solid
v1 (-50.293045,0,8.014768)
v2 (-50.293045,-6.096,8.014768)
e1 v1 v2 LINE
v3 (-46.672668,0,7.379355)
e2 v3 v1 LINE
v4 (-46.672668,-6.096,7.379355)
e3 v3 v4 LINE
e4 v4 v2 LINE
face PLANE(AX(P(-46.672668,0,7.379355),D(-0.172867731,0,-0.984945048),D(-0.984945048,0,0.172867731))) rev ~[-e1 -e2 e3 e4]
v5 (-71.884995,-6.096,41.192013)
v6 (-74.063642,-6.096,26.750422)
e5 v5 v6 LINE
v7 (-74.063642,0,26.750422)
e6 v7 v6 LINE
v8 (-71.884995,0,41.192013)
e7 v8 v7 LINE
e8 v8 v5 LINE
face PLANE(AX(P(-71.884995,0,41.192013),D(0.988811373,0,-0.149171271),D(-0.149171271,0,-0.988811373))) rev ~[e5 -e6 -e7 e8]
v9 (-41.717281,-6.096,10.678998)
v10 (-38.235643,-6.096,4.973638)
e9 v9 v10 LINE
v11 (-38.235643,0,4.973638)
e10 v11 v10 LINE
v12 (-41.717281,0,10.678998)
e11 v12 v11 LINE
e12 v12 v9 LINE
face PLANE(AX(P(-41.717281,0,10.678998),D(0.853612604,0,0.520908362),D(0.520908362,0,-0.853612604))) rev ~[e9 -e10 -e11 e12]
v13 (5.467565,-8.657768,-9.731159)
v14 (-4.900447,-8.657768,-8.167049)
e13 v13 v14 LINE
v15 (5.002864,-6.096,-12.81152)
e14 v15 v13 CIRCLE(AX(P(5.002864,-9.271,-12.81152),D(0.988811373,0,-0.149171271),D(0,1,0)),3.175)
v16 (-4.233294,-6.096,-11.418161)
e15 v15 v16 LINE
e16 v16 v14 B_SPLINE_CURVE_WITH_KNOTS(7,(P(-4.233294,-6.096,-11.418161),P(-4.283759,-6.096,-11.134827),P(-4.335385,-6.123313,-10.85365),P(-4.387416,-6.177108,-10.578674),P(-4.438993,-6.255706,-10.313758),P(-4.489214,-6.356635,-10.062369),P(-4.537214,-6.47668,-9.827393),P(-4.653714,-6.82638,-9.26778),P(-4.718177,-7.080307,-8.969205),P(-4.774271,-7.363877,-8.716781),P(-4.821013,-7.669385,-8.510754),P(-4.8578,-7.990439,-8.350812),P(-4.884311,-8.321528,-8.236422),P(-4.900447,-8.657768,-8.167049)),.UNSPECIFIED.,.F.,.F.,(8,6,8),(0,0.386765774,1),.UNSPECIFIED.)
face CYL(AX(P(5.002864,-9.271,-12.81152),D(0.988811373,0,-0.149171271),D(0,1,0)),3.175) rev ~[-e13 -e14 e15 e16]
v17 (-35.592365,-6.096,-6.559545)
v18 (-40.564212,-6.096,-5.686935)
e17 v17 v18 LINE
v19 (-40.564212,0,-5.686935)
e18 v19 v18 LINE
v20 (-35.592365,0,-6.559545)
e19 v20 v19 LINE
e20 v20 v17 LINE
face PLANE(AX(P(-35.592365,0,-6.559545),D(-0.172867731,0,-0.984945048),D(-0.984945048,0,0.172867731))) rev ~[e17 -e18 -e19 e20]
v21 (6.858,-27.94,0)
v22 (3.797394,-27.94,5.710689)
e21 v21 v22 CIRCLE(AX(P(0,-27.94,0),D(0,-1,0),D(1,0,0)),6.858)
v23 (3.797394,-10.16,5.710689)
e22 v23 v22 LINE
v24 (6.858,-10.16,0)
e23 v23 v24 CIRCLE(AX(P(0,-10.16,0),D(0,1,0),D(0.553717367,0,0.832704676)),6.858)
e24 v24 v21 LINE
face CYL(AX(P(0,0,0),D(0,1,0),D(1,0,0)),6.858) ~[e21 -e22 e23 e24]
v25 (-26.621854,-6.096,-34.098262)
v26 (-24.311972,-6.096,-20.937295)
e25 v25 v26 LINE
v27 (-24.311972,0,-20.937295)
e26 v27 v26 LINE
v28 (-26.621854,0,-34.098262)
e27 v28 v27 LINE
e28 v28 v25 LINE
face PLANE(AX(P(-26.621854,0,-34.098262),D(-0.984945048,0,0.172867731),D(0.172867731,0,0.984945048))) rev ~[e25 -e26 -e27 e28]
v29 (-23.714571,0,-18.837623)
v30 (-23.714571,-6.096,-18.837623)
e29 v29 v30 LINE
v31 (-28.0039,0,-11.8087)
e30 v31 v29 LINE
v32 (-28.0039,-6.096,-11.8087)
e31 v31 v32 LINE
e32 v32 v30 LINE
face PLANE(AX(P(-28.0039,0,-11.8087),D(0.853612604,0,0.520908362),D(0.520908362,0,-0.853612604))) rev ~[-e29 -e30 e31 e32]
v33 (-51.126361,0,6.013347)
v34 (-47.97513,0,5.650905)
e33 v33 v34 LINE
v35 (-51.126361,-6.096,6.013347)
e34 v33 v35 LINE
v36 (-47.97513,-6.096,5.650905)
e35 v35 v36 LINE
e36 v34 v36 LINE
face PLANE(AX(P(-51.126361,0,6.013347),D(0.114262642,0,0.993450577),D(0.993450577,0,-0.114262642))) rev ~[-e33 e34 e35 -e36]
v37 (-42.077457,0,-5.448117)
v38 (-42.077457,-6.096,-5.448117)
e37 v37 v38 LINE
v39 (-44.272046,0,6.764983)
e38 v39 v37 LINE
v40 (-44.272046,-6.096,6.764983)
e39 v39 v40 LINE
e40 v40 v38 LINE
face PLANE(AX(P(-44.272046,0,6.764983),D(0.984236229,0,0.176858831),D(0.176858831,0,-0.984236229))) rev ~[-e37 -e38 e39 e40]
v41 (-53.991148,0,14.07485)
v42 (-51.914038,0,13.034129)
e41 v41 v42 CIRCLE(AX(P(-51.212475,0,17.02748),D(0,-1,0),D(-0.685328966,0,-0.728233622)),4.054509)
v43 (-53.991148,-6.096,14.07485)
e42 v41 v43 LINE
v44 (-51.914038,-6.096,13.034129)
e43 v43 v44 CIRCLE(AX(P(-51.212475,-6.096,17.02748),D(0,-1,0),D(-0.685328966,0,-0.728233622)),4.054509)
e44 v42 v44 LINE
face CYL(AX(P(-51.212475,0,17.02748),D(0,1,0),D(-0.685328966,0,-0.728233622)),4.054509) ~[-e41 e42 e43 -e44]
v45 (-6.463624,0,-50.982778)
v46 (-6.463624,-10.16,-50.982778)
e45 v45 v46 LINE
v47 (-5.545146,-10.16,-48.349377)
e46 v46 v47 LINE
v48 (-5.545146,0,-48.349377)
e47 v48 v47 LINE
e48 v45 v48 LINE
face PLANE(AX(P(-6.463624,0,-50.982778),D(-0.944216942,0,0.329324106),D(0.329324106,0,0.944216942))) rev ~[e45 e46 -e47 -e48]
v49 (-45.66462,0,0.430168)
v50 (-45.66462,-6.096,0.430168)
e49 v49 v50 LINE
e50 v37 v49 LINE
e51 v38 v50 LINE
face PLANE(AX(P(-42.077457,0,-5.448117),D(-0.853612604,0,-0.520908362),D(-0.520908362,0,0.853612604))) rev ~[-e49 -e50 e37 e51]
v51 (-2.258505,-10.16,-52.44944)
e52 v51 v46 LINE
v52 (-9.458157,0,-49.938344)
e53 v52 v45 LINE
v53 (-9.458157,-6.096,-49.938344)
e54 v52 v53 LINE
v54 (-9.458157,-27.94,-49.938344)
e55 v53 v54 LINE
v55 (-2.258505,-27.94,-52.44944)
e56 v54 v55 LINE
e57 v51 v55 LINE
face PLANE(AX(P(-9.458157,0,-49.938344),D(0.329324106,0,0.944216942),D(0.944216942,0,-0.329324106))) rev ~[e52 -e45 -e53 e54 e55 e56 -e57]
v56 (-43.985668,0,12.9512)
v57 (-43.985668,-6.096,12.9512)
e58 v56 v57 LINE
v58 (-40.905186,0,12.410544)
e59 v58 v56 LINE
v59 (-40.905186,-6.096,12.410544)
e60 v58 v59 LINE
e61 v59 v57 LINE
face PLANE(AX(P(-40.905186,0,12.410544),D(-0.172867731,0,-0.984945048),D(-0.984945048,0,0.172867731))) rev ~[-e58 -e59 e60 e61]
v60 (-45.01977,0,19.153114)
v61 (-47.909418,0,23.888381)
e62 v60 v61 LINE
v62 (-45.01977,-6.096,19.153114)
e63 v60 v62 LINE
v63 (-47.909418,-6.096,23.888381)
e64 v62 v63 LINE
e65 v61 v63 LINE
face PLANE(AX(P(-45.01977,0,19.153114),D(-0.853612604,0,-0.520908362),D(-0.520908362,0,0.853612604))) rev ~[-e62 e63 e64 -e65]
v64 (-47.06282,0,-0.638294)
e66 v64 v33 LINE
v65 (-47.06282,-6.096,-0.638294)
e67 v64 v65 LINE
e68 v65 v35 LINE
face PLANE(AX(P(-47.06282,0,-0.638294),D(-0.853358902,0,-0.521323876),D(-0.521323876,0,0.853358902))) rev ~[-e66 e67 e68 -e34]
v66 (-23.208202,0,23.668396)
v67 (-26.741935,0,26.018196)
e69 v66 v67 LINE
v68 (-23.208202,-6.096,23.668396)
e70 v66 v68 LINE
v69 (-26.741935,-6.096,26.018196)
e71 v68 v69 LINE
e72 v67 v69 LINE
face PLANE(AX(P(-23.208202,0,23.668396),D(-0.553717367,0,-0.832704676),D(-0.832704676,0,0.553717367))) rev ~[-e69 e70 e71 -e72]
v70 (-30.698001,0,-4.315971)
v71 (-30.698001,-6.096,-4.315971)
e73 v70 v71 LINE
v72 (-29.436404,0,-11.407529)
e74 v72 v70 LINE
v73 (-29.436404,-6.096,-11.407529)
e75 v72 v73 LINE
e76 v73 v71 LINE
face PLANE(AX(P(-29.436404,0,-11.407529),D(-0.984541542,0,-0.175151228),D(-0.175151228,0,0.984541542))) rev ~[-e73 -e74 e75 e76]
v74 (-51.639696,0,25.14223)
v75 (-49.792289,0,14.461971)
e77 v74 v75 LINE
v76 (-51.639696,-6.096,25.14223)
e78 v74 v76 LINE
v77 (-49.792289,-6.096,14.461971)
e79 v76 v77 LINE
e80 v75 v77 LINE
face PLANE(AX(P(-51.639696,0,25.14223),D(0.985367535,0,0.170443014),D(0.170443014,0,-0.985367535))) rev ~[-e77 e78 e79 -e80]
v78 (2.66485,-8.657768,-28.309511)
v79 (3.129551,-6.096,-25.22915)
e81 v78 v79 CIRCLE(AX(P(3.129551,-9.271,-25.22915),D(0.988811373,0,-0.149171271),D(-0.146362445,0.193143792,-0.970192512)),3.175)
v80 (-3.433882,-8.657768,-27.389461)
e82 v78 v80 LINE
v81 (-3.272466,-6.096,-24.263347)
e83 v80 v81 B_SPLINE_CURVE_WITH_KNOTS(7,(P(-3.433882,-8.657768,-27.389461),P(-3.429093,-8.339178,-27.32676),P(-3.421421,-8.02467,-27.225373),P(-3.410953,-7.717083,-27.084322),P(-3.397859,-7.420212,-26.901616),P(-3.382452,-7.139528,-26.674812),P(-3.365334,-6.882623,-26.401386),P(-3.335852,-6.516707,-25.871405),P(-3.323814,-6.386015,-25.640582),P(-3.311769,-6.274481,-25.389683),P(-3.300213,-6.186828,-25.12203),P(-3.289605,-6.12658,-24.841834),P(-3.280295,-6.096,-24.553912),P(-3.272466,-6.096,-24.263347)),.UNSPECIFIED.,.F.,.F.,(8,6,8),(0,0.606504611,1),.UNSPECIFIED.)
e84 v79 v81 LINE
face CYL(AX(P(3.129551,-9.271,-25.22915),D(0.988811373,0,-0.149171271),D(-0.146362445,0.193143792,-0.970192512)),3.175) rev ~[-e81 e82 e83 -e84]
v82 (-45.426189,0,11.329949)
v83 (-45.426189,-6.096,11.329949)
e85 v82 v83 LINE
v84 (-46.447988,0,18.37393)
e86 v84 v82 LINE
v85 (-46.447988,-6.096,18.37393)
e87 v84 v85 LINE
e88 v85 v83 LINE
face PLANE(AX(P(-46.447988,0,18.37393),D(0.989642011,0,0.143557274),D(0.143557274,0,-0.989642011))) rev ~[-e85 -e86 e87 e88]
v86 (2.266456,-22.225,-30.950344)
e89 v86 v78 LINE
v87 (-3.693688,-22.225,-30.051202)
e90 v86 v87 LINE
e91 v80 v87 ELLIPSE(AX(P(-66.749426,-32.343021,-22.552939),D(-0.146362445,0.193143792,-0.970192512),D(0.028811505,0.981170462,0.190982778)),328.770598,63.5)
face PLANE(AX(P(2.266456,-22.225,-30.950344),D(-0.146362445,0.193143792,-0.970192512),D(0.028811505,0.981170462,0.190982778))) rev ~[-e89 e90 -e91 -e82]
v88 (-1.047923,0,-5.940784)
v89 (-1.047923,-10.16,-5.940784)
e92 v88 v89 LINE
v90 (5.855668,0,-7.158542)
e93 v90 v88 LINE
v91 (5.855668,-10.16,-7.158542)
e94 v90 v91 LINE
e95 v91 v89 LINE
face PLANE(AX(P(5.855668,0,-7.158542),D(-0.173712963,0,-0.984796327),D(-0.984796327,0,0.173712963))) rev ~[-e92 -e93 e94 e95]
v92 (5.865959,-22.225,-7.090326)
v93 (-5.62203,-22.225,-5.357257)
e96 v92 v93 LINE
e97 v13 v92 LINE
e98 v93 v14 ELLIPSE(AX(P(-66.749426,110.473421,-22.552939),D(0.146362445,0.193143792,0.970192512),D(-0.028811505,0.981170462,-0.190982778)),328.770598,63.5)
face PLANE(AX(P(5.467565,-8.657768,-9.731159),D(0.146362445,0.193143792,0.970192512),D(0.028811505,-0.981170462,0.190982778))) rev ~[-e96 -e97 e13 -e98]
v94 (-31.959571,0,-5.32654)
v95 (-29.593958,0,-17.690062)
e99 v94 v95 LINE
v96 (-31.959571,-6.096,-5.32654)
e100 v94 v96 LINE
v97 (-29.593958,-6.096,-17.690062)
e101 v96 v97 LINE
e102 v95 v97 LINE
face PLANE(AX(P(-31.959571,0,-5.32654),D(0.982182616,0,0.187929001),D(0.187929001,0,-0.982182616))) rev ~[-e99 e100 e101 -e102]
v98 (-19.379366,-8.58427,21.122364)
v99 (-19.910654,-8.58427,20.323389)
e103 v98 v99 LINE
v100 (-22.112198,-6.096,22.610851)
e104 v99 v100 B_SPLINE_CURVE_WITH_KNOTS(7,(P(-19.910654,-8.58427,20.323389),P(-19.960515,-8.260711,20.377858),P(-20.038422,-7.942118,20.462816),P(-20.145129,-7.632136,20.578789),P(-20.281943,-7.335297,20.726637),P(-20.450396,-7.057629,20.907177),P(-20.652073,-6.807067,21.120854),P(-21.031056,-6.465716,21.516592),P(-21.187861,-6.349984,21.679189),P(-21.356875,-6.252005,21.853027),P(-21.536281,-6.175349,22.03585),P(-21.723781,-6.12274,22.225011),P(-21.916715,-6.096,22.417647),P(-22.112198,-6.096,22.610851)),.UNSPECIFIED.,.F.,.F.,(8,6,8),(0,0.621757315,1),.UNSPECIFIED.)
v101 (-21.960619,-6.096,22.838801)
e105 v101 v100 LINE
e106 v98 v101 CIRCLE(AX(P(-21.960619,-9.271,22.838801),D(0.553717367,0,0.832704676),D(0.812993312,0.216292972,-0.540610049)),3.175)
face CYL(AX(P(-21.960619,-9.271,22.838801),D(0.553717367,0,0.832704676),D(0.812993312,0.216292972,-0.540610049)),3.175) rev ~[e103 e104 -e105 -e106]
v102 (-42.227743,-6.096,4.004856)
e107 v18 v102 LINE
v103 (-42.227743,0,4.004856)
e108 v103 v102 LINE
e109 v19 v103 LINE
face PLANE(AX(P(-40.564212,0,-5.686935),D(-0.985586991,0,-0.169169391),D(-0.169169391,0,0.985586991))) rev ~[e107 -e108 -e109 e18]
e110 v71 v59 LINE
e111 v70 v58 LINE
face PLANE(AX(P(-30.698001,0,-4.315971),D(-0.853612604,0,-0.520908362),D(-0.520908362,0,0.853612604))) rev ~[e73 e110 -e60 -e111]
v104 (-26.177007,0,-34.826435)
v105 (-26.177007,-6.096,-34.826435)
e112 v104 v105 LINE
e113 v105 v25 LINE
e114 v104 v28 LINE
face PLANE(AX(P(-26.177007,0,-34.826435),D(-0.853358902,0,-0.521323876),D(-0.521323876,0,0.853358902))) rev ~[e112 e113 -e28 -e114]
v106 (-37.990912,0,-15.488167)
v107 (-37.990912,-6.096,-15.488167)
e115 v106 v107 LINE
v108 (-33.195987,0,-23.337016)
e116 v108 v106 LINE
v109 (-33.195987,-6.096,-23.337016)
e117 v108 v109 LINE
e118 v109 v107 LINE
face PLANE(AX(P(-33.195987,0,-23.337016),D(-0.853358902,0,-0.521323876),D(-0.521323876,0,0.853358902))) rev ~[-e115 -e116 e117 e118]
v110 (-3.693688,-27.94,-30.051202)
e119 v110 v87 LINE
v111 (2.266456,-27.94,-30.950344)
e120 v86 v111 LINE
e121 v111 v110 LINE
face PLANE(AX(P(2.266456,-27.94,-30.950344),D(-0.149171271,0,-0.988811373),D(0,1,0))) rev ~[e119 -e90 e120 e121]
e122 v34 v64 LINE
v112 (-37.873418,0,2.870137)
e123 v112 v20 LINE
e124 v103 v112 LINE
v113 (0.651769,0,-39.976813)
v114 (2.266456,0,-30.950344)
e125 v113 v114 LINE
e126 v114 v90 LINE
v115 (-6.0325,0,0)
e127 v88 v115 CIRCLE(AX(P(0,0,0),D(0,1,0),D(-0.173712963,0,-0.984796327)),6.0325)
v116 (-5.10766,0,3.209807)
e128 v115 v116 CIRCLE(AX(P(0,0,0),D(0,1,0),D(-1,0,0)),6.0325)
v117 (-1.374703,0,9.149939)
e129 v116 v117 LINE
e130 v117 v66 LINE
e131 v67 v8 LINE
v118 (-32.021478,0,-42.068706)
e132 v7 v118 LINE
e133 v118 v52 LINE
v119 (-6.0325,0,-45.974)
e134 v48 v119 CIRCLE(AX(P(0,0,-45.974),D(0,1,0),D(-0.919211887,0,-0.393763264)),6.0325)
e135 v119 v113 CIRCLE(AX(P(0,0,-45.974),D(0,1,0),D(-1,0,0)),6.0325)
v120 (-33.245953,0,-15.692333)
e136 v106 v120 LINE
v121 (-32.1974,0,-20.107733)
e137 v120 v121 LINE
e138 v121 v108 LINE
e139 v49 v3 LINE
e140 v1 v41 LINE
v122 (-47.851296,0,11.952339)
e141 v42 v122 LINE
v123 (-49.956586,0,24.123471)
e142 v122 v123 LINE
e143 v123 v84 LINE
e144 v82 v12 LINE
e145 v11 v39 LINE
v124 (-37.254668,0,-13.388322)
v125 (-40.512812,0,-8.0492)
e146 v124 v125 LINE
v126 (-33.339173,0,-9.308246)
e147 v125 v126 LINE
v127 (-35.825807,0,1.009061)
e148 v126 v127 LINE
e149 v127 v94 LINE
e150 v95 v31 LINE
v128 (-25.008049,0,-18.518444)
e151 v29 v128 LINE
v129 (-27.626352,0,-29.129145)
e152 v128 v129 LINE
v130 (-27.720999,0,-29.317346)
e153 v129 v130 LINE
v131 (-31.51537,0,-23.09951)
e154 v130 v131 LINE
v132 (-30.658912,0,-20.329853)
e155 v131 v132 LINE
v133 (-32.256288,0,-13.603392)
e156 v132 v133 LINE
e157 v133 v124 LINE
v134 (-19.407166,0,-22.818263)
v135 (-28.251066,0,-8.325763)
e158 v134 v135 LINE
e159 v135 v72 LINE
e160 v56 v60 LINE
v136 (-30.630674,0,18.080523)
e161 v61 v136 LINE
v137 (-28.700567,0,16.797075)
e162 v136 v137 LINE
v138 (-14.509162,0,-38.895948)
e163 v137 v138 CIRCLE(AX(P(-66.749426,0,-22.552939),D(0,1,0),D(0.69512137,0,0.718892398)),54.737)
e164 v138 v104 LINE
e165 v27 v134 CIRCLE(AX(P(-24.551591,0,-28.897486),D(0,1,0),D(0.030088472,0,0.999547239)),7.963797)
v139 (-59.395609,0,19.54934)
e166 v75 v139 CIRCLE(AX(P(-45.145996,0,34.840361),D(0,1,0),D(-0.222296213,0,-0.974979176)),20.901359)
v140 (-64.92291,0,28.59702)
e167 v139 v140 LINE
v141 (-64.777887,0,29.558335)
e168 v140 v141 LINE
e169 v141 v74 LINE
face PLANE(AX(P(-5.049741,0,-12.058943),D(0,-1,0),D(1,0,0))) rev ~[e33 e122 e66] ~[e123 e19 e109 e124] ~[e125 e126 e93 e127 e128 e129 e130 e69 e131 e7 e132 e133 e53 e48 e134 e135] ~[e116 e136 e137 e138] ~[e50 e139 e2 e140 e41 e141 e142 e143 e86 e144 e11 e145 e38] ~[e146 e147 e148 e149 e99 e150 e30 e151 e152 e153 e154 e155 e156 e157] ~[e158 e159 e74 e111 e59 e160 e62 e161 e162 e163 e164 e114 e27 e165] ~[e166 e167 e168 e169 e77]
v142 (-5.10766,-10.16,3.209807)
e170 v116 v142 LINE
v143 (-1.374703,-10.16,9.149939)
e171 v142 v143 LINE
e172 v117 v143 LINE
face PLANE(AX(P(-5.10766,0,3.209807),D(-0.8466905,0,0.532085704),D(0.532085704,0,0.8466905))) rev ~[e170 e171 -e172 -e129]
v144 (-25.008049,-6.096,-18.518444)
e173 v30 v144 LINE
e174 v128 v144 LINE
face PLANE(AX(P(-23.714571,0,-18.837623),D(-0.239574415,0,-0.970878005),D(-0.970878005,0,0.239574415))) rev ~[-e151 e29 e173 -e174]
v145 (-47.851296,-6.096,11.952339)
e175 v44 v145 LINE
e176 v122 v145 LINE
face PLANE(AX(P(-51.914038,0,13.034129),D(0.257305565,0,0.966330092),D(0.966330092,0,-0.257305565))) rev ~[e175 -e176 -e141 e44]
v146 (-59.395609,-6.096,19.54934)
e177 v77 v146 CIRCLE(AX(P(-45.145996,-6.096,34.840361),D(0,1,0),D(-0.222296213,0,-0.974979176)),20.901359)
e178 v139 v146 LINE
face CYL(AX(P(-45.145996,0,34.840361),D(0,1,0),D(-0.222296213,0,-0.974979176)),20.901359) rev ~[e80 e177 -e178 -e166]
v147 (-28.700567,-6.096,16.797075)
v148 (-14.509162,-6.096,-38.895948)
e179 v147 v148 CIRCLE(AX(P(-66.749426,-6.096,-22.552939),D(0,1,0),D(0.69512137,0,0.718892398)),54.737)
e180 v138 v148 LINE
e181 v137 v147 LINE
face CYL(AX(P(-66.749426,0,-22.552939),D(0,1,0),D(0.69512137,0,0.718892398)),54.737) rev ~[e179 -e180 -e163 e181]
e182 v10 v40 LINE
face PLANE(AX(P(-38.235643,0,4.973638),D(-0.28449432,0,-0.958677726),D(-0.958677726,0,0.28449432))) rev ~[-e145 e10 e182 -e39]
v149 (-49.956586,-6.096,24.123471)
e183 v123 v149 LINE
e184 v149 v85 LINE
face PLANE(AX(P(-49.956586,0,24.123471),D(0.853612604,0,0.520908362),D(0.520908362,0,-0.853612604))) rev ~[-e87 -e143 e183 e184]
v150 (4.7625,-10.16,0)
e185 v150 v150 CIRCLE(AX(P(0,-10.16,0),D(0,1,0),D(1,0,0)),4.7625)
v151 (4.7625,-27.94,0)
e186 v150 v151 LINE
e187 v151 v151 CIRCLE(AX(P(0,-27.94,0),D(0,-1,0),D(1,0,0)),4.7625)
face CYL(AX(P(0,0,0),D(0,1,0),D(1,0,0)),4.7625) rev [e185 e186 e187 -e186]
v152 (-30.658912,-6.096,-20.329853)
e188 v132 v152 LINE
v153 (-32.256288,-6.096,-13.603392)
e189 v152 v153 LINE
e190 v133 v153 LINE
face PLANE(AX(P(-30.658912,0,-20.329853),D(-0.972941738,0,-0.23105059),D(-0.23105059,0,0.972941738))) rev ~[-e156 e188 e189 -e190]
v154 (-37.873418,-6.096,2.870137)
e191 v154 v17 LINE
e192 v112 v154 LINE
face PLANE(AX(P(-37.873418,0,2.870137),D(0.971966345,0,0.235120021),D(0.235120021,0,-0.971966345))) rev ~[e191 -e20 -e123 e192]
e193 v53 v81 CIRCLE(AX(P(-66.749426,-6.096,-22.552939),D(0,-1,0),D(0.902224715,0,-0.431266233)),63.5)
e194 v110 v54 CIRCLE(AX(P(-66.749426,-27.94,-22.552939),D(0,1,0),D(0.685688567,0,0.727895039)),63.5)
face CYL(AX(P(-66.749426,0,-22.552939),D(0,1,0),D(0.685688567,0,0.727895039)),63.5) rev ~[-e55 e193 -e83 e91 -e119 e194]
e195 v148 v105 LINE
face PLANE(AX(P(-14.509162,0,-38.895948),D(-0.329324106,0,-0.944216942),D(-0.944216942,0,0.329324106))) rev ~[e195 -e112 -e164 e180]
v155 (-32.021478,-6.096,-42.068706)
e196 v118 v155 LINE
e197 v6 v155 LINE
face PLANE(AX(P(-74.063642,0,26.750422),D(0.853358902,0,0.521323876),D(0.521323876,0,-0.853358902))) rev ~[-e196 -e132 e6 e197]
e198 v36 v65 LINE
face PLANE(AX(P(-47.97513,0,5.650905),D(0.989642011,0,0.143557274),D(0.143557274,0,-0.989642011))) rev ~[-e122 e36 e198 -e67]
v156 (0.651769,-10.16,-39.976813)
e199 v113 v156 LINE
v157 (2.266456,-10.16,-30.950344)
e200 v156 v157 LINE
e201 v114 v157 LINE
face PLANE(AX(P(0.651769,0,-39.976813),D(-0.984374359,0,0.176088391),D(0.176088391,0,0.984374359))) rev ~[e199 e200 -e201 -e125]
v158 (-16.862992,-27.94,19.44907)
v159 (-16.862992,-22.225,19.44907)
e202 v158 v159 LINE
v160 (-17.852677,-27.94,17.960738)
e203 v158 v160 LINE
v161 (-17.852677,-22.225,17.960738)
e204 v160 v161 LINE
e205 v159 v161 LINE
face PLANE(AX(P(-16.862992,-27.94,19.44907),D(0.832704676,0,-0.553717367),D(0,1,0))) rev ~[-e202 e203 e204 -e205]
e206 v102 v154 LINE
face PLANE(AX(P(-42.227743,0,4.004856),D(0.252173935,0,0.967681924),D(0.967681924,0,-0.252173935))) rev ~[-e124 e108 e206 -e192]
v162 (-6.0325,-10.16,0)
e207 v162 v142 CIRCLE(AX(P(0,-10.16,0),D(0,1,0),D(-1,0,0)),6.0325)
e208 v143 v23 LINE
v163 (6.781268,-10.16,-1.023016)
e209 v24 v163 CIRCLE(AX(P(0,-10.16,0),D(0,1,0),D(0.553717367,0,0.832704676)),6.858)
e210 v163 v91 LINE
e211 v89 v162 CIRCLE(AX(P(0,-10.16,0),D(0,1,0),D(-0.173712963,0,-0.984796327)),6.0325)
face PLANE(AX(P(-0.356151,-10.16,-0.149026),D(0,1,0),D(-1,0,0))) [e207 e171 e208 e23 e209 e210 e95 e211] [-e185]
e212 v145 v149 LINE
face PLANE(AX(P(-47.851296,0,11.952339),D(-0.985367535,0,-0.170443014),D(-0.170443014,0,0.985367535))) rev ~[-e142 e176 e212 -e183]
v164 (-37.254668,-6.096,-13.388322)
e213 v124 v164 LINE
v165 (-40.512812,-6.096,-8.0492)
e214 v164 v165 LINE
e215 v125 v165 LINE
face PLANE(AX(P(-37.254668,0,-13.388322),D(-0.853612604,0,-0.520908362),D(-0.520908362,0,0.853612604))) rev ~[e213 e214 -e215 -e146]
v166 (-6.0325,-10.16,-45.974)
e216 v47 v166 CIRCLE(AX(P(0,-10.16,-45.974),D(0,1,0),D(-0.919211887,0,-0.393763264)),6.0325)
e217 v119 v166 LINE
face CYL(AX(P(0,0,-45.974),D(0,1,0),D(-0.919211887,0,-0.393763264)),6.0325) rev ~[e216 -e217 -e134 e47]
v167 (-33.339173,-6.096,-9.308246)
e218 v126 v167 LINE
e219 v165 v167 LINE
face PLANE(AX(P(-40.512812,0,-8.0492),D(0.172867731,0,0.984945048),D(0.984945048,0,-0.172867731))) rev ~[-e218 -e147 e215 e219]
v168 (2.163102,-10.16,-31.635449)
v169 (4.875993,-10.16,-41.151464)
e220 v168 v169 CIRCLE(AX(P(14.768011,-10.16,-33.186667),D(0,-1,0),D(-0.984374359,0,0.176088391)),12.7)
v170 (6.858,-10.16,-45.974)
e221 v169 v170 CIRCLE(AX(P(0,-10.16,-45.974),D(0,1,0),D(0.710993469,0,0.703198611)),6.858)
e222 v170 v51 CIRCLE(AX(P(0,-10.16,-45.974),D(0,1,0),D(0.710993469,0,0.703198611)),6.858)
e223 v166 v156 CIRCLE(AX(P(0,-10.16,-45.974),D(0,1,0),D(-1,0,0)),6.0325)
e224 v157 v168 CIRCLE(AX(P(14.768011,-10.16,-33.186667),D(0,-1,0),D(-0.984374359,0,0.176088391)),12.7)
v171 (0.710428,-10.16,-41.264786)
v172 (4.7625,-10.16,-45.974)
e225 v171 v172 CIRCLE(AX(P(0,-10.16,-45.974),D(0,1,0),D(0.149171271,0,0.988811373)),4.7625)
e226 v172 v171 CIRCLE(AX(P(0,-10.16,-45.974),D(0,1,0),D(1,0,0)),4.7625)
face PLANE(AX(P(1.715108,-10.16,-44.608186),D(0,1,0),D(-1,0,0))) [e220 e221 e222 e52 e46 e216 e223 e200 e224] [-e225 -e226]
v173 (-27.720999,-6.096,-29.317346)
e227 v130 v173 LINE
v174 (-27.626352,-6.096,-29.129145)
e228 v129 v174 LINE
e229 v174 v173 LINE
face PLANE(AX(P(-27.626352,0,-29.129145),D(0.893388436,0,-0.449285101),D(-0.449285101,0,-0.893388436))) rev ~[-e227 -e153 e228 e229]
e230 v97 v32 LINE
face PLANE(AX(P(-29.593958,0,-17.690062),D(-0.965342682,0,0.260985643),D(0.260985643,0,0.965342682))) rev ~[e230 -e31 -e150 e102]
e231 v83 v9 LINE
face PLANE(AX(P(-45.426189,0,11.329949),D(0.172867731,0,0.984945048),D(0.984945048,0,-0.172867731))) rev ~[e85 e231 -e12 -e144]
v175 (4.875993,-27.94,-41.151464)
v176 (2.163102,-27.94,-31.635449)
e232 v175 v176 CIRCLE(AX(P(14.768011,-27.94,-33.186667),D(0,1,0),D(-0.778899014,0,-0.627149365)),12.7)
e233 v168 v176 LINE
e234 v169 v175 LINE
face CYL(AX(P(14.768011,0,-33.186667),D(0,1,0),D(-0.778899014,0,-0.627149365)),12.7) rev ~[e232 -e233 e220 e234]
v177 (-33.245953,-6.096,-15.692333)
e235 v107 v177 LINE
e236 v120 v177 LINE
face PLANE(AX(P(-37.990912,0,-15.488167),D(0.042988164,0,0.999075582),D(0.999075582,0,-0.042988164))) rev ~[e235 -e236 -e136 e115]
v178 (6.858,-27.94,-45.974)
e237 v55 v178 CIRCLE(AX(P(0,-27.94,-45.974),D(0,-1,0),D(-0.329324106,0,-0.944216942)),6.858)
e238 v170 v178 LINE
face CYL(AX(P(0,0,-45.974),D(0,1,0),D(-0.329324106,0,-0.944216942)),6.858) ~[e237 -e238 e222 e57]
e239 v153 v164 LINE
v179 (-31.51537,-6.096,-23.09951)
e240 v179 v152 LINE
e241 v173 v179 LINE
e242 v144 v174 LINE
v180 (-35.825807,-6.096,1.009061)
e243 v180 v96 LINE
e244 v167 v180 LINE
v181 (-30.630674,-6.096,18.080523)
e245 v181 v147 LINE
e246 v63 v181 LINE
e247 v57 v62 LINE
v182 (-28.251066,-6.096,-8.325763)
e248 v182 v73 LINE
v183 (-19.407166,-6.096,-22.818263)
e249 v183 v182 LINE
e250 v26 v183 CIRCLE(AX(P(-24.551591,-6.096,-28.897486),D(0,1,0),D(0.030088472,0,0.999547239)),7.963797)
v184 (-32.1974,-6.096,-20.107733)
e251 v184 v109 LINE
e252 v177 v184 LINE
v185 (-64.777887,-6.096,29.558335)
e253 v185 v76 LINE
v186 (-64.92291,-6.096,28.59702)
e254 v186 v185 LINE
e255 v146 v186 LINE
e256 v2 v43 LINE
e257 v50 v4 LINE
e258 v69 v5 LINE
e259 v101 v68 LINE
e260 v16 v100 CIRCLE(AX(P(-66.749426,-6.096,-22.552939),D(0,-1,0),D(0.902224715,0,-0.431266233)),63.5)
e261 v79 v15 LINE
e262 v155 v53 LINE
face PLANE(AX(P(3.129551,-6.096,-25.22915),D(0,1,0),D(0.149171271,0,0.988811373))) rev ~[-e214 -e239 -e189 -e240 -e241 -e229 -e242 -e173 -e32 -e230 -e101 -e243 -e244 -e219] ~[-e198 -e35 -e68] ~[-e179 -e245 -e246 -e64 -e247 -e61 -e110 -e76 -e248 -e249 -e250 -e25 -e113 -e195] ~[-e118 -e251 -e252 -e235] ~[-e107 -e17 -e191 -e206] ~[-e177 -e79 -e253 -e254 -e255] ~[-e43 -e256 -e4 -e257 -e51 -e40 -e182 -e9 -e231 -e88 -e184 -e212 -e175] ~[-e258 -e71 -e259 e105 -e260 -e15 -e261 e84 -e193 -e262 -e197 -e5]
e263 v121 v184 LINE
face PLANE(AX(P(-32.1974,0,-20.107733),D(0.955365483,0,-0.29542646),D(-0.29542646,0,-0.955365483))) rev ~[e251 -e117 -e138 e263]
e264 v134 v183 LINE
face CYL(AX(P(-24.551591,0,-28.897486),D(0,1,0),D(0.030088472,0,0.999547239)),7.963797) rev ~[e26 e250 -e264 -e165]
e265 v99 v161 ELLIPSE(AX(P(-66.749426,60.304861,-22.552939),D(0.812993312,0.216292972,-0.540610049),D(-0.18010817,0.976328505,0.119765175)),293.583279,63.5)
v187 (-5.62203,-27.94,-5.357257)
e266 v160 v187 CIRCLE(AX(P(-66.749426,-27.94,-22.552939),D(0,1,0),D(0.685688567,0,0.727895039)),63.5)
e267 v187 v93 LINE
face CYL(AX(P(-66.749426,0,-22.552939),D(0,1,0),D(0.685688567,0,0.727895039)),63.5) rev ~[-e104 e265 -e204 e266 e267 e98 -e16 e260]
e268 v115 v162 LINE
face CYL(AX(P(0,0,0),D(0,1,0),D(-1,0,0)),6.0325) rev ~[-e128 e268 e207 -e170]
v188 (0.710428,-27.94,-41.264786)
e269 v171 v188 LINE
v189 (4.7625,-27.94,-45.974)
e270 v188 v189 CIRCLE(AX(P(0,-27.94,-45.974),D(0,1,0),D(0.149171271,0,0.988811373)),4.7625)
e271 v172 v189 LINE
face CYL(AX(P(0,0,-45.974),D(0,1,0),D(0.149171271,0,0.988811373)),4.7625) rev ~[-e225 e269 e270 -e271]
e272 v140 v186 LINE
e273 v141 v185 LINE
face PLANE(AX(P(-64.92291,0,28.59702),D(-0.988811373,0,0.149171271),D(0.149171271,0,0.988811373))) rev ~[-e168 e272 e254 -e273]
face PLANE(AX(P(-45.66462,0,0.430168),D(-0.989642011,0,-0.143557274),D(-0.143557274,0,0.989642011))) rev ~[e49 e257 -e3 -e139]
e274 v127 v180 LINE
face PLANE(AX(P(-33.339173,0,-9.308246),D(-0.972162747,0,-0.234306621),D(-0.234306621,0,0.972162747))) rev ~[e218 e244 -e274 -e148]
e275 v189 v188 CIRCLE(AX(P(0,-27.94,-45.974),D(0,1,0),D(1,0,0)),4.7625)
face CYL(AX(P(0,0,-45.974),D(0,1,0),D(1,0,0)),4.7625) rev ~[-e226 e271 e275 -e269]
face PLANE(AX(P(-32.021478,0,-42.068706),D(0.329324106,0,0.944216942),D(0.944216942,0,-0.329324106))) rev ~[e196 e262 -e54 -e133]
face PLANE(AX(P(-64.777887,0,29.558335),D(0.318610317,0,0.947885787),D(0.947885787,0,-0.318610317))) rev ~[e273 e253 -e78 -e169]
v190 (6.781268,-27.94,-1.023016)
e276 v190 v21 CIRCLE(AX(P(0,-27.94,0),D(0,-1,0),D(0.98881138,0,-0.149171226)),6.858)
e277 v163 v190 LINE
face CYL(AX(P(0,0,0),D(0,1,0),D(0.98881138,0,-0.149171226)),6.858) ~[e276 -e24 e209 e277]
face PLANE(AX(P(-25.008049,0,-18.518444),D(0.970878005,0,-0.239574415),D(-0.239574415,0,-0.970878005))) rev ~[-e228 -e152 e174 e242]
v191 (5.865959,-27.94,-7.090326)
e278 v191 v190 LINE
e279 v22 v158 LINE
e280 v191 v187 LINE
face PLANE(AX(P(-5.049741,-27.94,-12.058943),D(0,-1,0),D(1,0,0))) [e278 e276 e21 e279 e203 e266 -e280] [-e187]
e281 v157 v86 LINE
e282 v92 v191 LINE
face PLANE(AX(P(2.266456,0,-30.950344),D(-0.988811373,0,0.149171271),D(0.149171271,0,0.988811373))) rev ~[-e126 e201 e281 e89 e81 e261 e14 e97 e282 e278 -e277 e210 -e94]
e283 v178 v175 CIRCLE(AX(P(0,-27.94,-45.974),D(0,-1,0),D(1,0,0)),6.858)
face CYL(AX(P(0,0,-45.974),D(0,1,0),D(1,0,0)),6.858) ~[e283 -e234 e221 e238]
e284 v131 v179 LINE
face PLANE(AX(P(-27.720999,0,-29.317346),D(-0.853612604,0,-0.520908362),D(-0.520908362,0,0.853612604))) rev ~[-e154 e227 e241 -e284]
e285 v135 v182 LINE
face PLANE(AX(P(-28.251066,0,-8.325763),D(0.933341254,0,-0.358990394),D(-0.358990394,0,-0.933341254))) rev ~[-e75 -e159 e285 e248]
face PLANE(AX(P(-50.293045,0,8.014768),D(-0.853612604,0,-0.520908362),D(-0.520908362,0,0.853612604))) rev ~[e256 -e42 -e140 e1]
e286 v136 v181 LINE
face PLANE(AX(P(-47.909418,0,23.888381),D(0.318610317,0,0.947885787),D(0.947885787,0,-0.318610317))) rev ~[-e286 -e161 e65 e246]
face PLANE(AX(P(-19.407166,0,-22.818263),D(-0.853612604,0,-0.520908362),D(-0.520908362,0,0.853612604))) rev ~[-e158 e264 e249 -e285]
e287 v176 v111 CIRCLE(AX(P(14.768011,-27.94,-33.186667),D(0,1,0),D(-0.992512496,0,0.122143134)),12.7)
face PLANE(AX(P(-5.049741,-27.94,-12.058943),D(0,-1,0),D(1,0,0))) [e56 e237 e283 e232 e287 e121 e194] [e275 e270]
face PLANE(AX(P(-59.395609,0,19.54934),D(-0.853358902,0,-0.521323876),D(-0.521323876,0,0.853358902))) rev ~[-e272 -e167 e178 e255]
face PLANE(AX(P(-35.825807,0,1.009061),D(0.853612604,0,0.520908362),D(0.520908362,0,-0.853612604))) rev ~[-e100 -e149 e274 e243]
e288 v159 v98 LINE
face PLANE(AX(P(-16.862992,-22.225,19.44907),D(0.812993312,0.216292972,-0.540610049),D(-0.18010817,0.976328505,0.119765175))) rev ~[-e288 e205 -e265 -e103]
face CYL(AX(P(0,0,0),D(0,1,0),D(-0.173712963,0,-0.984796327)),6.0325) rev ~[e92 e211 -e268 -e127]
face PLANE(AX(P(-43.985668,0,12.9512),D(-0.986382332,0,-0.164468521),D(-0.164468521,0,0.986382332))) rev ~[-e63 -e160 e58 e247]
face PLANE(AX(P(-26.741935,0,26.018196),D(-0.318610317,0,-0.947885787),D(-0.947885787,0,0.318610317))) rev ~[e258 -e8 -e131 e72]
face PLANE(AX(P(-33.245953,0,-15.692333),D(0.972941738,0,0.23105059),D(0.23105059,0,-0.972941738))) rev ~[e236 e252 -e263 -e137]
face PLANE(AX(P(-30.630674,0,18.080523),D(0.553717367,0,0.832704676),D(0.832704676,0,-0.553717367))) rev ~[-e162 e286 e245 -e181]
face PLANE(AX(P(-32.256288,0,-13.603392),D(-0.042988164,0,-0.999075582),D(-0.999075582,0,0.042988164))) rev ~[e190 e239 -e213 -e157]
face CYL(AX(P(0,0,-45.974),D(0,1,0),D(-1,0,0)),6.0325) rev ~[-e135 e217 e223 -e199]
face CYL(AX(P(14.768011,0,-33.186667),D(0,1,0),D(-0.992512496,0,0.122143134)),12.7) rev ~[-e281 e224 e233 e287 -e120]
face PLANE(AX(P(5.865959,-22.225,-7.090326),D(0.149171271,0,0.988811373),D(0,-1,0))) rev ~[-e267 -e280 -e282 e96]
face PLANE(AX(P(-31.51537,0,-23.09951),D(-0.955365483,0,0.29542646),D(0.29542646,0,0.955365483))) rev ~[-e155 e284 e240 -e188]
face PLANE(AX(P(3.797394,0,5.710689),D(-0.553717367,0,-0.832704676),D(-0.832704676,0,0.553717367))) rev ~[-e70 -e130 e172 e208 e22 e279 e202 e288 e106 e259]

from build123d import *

# Parameters (mm, degrees)
F1_DEPTH = 6.096
F0_R     = 4.7625
F2_DEPTH = 27.94
F3_R     = 4.7625
F4_DEPTH = 10.16
F6_DEPTH = 25.4
F8_DEPTH = 25.4


# Not quite as in the source:
# - ends of sketch curves that miss each other by under 0.0002 mm in the source are joined


with BuildPart() as f1:
    # F0 (on Front) → F1 (new body)
    with BuildSketch(Plane.XZ):
        with BuildLine():
            Line((-32.0214776694, -42.0687062724), (-9.4581565389, -49.9383443038))
            ThreePointArc((-9.4581565389, -49.9383443038), (-4.3291887886, -10.8925785557), (-23.2082019061, 23.6683964993))
            Line((-23.2082019061, 23.6683964993), (-26.7419346225, 26.0181961702))
            Line((-26.7419346225, 26.0181961702), (-71.8849952467, 41.1920125155))
            Line((-71.8849952467, 41.1920125155), (-74.0636416555, 26.7504224083))
            Line((-74.0636416555, 26.7504224083), (-32.0214776694, -42.0687062724))
        make_face()
        with BuildLine():
            Line((-64.9229101249, 28.5970199237), (-64.7778869932, 29.5583345343))
            Line((-64.7778869932, 29.5583345343), (-51.6396961272, 25.1422295438))
            Line((-51.6396961272, 25.1422295438), (-52.8126453404, 31.9232999149))
            Line((-52.8126453404, 31.9232999149), (-47.9094184009, 23.888381259))
            Line((-47.9094184009, 23.888381259), (-30.6306738726, 18.0805230295))
            Line((-30.6306738726, 18.0805230295), (-28.7005674828, 16.7970746978))
            ThreePointArc((-28.7005674828, 16.7970746978), (-13.7073707997, -9.0370384003), (-14.5091616555, -38.895947921))
            Line((-14.5091616555, -38.895947921), (-26.1770067548, -34.8264354141))
            Line((-26.1770067548, -34.8264354141), (-26.621853962, -34.0982617358))
            Line((-26.621853962, -34.0982617358), (-26.6298627107, -34.143893025))
            Line((-26.6298627107, -34.143893025), (-33.2056261218, -23.3681886247))
            Line((-33.2056261218, -23.3681886247), (-33.1959865258, -23.3370155967))
            Line((-33.1959865258, -23.3370155967), (-37.9909119068, -15.4881668334))
            Line((-37.9909119068, -15.4881668334), (-38.0149602805, -15.4871320814))
            Line((-38.0149602805, -15.4871320814), (-47.058612277, -0.6672983188))
            Line((-47.058612277, -0.6672983188), (-47.0628196228, -0.6382941035))
            Line((-47.0628196228, -0.6382941035), (-51.126360936, 6.0133466785))
            Line((-51.126360936, 6.0133466785), (-51.1360904547, 6.0144657282))
            Line((-51.1360904547, 6.0144657282), (-59.3956089847, 19.549339872))
            Line((-59.3956089847, 19.549339872), (-64.9229101249, 28.5970199237))
        make_face(mode=Mode.SUBTRACT)
        Polygon((-52.8126453404, 31.9232999149), (-51.6396961272, 25.1422295438), (-47.9094184009, 23.888381259), align=None)
        with BuildLine():
            Line((-47.9094184009, 23.888381259), (-51.6396961272, 25.1422295438))
            Line((-51.6396961272, 25.1422295438), (-49.7922885775, 14.4619712189))
            ThreePointArc((-49.7922885775, 14.4619712189), (-54.9303785287, 16.3705840809), (-59.3956089847, 19.549339872))
            Line((-59.3956089847, 19.549339872), (-51.126360936, 6.0133466785))
            Line((-51.126360936, 6.0133466785), (-47.9751295821, 5.650904873))
            Line((-47.9751295821, 5.650904873), (-47.0628196228, -0.6382941035))
            Line((-47.0628196228, -0.6382941035), (-37.9909119068, -15.4881668334))
            Line((-37.9909119068, -15.4881668334), (-33.2459525636, -15.6923326562))
            Line((-33.2459525636, -15.6923326562), (-32.1973996311, -20.1077332485))
            Line((-32.1973996311, -20.1077332485), (-33.1959865258, -23.3370155967))
            Line((-33.1959865258, -23.3370155967), (-26.621853962, -34.0982617358))
            Line((-26.621853962, -34.0982617358), (-24.3119723824, -20.937295163))
            ThreePointArc((-24.3119723824, -20.937295163), (-21.7000142249, -21.4617233548), (-19.4071664649, -22.8182628838))
            Line((-19.4071664649, -22.8182628838), (-28.2510661679, -8.3257632317))
            Line((-28.2510661679, -8.3257632317), (-29.4364036114, -11.4075290833))
            Line((-29.4364036114, -11.4075290833), (-30.6980011467, -4.3159705476))
            Line((-30.6980011467, -4.3159705476), (-40.9051855797, 12.4105439777))
            Line((-40.9051855797, 12.4105439777), (-43.9856683867, 12.9511995939))
            Line((-43.9856683867, 12.9511995939), (-45.0197701825, 19.1531143287))
            Line((-45.0197701825, 19.1531143287), (-47.9094184009, 23.888381259))
        make_face()
        Polygon((-27.6263519566, -29.1291445767), (-27.7209985719, -29.3173462139), (-31.515369772, -23.0995096098), (-30.6589124026, -20.3298531285), (-32.2562875166, -13.6033915394), (-37.2546680921, -13.3883215232), (-40.5128122557, -8.0492002372), (-33.339172628, -9.3082459116), (-35.8258069544, 1.0090607264), (-31.9595713249, -5.326540128), (-29.5939579287, -17.6900622221), (-28.0038996356, -11.8086998658), (-23.7145710116, -18.8376232681), (-25.0080493325, -18.5184438136), align=None, mode=Mode.SUBTRACT)
        Polygon((-42.2277428728, 4.0048563327), (-37.873417838, 2.8701371118), (-35.5923646419, -6.559544504), (-40.5642118698, -5.6869354699), align=None, mode=Mode.SUBTRACT)
        with BuildLine():
            Line((-46.4479878328, 18.3739303005), (-45.4261892475, 11.3299486454))
            Line((-45.4261892475, 11.3299486454), (-41.7172805078, 10.6789979777))
            Line((-41.7172805078, 10.6789979777), (-38.2356426654, 4.9736375696))
            Line((-38.2356426654, 4.9736375696), (-44.2720463387, 6.7649825752))
            Line((-44.2720463387, 6.7649825752), (-42.0774568025, -5.4481170908))
            Line((-42.0774568025, -5.4481170908), (-45.6646201437, 0.4301679667))
            Line((-45.6646201437, 0.4301679667), (-46.6726678742, 7.3793552358))
            Line((-46.6726678742, 7.3793552358), (-50.293044526, 8.0147676345))
            Line((-50.293044526, 8.0147676345), (-53.9911477917, 14.0748499614))
            ThreePointArc((-53.9911477917, 14.0748499614), (-53.0287307311, 13.4025301345), (-51.9140375876, 13.0341285278))
            Line((-51.9140375876, 13.0341285278), (-47.8512962747, 11.9523388206))
            Line((-47.8512962747, 11.9523388206), (-49.9565863421, 24.1234711571))
            Line((-49.9565863421, 24.1234711571), (-46.4479878328, 18.3739303005))
        make_face(mode=Mode.SUBTRACT)
        Polygon((-37.9909119068, -15.4881668334), (-47.0628196228, -0.6382941035), (-47.058612277, -0.6672983188), (-38.0149602805, -15.4871320814), align=None)
        Polygon((-26.621853962, -34.0982617358), (-33.1959865258, -23.3370155967), (-33.2056261218, -23.3681886247), (-26.6298627107, -34.143893025), align=None)
        Polygon((-51.126360936, 6.0133466785), (-59.3956089847, 19.549339872), (-51.1360904547, 6.0144657282), align=None)
    extrude(amount=F1_DEPTH)

    # F0 (on Front) → F2 (join)
    with BuildSketch(Plane.XZ):
        with BuildLine():
            ThreePointArc((-2.2585047177, -52.4494397874), (-6.6570778662, -44.3261291668), (1.0230165746, -39.1927316018))
            Line((1.0230165746, -39.1927316018), (2.1631019861, -31.6354491837))
            ThreePointArc((2.1631019861, -31.6354491837), (2.210106245, -31.292191847), (2.2664563284, -30.9503444137))
            Line((2.2664563284, -30.9503444137), (6.781268444, -1.0230162708))
            ThreePointArc((6.781268444, -1.0230162708), (-6.2699855461, -2.7783889669), (3.7973937006, 5.7106886698))
            Line((3.7973937006, 5.7106886698), (-23.2082019061, 23.6683964993))
            ThreePointArc((-23.2082019061, 23.6683964993), (-4.3291887886, -10.8925785557), (-9.4581565389, -49.9383443038))
            Line((-9.4581565389, -49.9383443038), (-2.2585047177, -52.4494397874))
        make_face()
        with BuildLine():
            ThreePointArc((3.7973937006, 5.7106886698), (-6.2699855461, -2.7783889669), (6.781268444, -1.0230162708))
            ThreePointArc((6.781268444, -1.0230162708), (6.8387902069, -0.5129449342), (6.858, 0))
            ThreePointArc((6.858, 0), (6.0446128908, 3.239570805), (3.7973937006, 5.7106886698))
        make_face()
        Circle(F0_R, mode=Mode.SUBTRACT)
        with BuildLine():
            Line((2.1631019861, -31.6354491837), (1.0230165746, -39.1927316018))
            ThreePointArc((1.0230165746, -39.1927316018), (3.1078508959, -39.8606190362), (4.8759932113, -41.1514639241))
            ThreePointArc((4.8759932113, -41.1514639241), (2.5546345778, -36.6685406241), (2.1631019861, -31.6354491837))
        make_face()
        with BuildLine():
            ThreePointArc((4.8759932113, -41.1514639241), (3.1078508959, -39.8606190362), (1.0230165746, -39.1927316018))
            ThreePointArc((1.0230165746, -39.1927316018), (-6.6570778662, -44.3261291668), (-2.2585047177, -52.4494397874))
            ThreePointArc((-2.2585047177, -52.4494397874), (3.9713561063, -51.5651085374), (6.858, -45.974))
            ThreePointArc((6.858, -45.974), (6.3431744987, -43.3670283318), (4.8759932113, -41.1514639241))
        make_face()
        with BuildLine():
            ThreePointArc((0.7104281768, -41.2647858346), (3.6100429666, -42.8677166857), (4.7625, -45.974))
            ThreePointArc((4.7625, -45.974), (-3.6100429666, -49.0802833143), (0.7104281768, -41.2647858346))
        make_face(mode=Mode.SUBTRACT)
    extrude(amount=F2_DEPTH)

    # F3 (on face) → F4 (cut)
    with BuildSketch(Plane(origin=(0, 0, 0), x_dir=(-1, 0, 0), z_dir=(0, 1, 0))):
        with BuildLine():
            ThreePointArc((1.0479234506, -5.9407838449), (4.6212906458, -3.8774642509), (6.0325, 0))
            ThreePointArc((6.0325, 0), (5.7966808552, 1.6701937951), (5.1076604432, 3.2098070109))
            ThreePointArc((5.1076604432, 3.2098070109), (-5.5141755069, 2.4464105806), (1.0479234506, -5.9407838449))
        make_face()
        Circle(F3_R, mode=Mode.SUBTRACT)
        with BuildLine():
            ThreePointArc((1.0479234506, -5.9407838449), (-5.5141755069, 2.4464105806), (5.1076604432, 3.2098070109))
            Line((5.1076604432, 3.2098070109), (1.3747032796, 9.1499391047))
            Line((1.3747032796, 9.1499391047), (-3.7973937006, 5.7106886698))
            ThreePointArc((-3.7973937006, 5.7106886698), (-6.2699855461, 2.7783889669), (-6.781268444, -1.0230162708))
            Line((-6.781268444, -1.0230162708), (-5.8556681398, -7.158541587))
            Line((-5.8556681398, -7.158541587), (1.0479234506, -5.9407838449))
        make_face()
        with BuildLine():
            Line((-0.6517694903, -39.9768129276), (-2.2664563284, -30.9503444137))
            ThreePointArc((-2.2664563284, -30.9503444137), (-2.46420133, -36.3340905871), (-4.8759932113, -41.1514639241))
            ThreePointArc((-4.8759932113, -41.1514639241), (-5.7986098468, -49.6357329019), (2.2585047177, -52.4494397874))
            Line((2.2585047177, -52.4494397874), (6.4636236378, -50.9827778723))
            Line((6.4636236378, -50.9827778723), (5.5451457053, -48.3493768874))
            ThreePointArc((5.5451457053, -48.3493768874), (-4.8488389859, -49.5628461571), (-0.6517694903, -39.9768129276))
        make_face()
        with BuildLine():
            ThreePointArc((6.0325, -45.974), (4.0286012957, -41.483852135), (-0.6517694903, -39.9768129276))
            ThreePointArc((-0.6517694903, -39.9768129276), (-4.8488389859, -49.5628461571), (5.5451457053, -48.3493768874))
            ThreePointArc((5.5451457053, -48.3493768874), (5.9094055419, -47.1864283036), (6.0325, -45.974))
        make_face()
        with Locations((0, -45.974)):
            Circle(F3_R, mode=Mode.SUBTRACT)
        with Locations((0, -45.974)):
            Circle(F3_R)
    extrude(amount=-F4_DEPTH, mode=Mode.SUBTRACT)

    # F5 (on face) → F6 (cut)
    with BuildSketch(Plane(origin=(6.7812683982, 0, -1.0230165746), x_dir=(0, 1, 0), z_dir=(0.9888113733, 0, -0.1491712707))):
        with BuildLine():
            Line((-27.94, -6.1359623937), (-27.94, -30.2659623937))
            Line((-27.94, -30.2659623937), (-22.225, -30.2659623937))
            Line((-22.225, -30.2659623937), (-8.6577684612, -27.5952475238))
            ThreePointArc((-8.6577684612, -27.5952475238), (-6.81869138, -26.496664003), (-6.096, -24.4800313066))
            Line((-6.096, -24.4800313066), (-6.096, -18.2009623937))
            Line((-6.096, -18.2009623937), (-6.096, -11.9218934807))
            ThreePointArc((-6.096, -11.9218934807), (-6.81869138, -9.9052607843), (-8.6577684612, -8.8066772635))
            Line((-8.6577684612, -8.8066772635), (-22.225, -6.1359623937))
            Line((-22.225, -6.1359623937), (-27.94, -6.1359623937))
        make_face()
    extrude(amount=-F6_DEPTH, mode=Mode.SUBTRACT)

    # F7 (on face) → F8 (cut)
    with BuildSketch(Plane(origin=(3.7973937006, 0, 5.7106886698), x_dir=(0.8327046763, 0, -0.5537173667), z_dir=(0.5537173667, 0, 0.8327046763))):
        with BuildLine():
            Line((-32.4311804374, -6.096), (-32.4311804374, -27.94))
            Line((-32.4311804374, -27.94), (-24.8111804374, -27.94))
            Line((-24.8111804374, -27.94), (-24.8111804374, -22.225))
            Line((-24.8111804374, -22.225), (-27.8331080585, -8.5842698128))
            ThreePointArc((-27.8331080585, -8.5842698128), (-28.9454580871, -6.7950160194), (-30.9329510626, -6.096))
            Line((-30.9329510626, -6.096), (-32.4311804374, -6.096))
        make_face()
    extrude(amount=-F8_DEPTH, mode=Mode.SUBTRACT)


solid = f1.part
